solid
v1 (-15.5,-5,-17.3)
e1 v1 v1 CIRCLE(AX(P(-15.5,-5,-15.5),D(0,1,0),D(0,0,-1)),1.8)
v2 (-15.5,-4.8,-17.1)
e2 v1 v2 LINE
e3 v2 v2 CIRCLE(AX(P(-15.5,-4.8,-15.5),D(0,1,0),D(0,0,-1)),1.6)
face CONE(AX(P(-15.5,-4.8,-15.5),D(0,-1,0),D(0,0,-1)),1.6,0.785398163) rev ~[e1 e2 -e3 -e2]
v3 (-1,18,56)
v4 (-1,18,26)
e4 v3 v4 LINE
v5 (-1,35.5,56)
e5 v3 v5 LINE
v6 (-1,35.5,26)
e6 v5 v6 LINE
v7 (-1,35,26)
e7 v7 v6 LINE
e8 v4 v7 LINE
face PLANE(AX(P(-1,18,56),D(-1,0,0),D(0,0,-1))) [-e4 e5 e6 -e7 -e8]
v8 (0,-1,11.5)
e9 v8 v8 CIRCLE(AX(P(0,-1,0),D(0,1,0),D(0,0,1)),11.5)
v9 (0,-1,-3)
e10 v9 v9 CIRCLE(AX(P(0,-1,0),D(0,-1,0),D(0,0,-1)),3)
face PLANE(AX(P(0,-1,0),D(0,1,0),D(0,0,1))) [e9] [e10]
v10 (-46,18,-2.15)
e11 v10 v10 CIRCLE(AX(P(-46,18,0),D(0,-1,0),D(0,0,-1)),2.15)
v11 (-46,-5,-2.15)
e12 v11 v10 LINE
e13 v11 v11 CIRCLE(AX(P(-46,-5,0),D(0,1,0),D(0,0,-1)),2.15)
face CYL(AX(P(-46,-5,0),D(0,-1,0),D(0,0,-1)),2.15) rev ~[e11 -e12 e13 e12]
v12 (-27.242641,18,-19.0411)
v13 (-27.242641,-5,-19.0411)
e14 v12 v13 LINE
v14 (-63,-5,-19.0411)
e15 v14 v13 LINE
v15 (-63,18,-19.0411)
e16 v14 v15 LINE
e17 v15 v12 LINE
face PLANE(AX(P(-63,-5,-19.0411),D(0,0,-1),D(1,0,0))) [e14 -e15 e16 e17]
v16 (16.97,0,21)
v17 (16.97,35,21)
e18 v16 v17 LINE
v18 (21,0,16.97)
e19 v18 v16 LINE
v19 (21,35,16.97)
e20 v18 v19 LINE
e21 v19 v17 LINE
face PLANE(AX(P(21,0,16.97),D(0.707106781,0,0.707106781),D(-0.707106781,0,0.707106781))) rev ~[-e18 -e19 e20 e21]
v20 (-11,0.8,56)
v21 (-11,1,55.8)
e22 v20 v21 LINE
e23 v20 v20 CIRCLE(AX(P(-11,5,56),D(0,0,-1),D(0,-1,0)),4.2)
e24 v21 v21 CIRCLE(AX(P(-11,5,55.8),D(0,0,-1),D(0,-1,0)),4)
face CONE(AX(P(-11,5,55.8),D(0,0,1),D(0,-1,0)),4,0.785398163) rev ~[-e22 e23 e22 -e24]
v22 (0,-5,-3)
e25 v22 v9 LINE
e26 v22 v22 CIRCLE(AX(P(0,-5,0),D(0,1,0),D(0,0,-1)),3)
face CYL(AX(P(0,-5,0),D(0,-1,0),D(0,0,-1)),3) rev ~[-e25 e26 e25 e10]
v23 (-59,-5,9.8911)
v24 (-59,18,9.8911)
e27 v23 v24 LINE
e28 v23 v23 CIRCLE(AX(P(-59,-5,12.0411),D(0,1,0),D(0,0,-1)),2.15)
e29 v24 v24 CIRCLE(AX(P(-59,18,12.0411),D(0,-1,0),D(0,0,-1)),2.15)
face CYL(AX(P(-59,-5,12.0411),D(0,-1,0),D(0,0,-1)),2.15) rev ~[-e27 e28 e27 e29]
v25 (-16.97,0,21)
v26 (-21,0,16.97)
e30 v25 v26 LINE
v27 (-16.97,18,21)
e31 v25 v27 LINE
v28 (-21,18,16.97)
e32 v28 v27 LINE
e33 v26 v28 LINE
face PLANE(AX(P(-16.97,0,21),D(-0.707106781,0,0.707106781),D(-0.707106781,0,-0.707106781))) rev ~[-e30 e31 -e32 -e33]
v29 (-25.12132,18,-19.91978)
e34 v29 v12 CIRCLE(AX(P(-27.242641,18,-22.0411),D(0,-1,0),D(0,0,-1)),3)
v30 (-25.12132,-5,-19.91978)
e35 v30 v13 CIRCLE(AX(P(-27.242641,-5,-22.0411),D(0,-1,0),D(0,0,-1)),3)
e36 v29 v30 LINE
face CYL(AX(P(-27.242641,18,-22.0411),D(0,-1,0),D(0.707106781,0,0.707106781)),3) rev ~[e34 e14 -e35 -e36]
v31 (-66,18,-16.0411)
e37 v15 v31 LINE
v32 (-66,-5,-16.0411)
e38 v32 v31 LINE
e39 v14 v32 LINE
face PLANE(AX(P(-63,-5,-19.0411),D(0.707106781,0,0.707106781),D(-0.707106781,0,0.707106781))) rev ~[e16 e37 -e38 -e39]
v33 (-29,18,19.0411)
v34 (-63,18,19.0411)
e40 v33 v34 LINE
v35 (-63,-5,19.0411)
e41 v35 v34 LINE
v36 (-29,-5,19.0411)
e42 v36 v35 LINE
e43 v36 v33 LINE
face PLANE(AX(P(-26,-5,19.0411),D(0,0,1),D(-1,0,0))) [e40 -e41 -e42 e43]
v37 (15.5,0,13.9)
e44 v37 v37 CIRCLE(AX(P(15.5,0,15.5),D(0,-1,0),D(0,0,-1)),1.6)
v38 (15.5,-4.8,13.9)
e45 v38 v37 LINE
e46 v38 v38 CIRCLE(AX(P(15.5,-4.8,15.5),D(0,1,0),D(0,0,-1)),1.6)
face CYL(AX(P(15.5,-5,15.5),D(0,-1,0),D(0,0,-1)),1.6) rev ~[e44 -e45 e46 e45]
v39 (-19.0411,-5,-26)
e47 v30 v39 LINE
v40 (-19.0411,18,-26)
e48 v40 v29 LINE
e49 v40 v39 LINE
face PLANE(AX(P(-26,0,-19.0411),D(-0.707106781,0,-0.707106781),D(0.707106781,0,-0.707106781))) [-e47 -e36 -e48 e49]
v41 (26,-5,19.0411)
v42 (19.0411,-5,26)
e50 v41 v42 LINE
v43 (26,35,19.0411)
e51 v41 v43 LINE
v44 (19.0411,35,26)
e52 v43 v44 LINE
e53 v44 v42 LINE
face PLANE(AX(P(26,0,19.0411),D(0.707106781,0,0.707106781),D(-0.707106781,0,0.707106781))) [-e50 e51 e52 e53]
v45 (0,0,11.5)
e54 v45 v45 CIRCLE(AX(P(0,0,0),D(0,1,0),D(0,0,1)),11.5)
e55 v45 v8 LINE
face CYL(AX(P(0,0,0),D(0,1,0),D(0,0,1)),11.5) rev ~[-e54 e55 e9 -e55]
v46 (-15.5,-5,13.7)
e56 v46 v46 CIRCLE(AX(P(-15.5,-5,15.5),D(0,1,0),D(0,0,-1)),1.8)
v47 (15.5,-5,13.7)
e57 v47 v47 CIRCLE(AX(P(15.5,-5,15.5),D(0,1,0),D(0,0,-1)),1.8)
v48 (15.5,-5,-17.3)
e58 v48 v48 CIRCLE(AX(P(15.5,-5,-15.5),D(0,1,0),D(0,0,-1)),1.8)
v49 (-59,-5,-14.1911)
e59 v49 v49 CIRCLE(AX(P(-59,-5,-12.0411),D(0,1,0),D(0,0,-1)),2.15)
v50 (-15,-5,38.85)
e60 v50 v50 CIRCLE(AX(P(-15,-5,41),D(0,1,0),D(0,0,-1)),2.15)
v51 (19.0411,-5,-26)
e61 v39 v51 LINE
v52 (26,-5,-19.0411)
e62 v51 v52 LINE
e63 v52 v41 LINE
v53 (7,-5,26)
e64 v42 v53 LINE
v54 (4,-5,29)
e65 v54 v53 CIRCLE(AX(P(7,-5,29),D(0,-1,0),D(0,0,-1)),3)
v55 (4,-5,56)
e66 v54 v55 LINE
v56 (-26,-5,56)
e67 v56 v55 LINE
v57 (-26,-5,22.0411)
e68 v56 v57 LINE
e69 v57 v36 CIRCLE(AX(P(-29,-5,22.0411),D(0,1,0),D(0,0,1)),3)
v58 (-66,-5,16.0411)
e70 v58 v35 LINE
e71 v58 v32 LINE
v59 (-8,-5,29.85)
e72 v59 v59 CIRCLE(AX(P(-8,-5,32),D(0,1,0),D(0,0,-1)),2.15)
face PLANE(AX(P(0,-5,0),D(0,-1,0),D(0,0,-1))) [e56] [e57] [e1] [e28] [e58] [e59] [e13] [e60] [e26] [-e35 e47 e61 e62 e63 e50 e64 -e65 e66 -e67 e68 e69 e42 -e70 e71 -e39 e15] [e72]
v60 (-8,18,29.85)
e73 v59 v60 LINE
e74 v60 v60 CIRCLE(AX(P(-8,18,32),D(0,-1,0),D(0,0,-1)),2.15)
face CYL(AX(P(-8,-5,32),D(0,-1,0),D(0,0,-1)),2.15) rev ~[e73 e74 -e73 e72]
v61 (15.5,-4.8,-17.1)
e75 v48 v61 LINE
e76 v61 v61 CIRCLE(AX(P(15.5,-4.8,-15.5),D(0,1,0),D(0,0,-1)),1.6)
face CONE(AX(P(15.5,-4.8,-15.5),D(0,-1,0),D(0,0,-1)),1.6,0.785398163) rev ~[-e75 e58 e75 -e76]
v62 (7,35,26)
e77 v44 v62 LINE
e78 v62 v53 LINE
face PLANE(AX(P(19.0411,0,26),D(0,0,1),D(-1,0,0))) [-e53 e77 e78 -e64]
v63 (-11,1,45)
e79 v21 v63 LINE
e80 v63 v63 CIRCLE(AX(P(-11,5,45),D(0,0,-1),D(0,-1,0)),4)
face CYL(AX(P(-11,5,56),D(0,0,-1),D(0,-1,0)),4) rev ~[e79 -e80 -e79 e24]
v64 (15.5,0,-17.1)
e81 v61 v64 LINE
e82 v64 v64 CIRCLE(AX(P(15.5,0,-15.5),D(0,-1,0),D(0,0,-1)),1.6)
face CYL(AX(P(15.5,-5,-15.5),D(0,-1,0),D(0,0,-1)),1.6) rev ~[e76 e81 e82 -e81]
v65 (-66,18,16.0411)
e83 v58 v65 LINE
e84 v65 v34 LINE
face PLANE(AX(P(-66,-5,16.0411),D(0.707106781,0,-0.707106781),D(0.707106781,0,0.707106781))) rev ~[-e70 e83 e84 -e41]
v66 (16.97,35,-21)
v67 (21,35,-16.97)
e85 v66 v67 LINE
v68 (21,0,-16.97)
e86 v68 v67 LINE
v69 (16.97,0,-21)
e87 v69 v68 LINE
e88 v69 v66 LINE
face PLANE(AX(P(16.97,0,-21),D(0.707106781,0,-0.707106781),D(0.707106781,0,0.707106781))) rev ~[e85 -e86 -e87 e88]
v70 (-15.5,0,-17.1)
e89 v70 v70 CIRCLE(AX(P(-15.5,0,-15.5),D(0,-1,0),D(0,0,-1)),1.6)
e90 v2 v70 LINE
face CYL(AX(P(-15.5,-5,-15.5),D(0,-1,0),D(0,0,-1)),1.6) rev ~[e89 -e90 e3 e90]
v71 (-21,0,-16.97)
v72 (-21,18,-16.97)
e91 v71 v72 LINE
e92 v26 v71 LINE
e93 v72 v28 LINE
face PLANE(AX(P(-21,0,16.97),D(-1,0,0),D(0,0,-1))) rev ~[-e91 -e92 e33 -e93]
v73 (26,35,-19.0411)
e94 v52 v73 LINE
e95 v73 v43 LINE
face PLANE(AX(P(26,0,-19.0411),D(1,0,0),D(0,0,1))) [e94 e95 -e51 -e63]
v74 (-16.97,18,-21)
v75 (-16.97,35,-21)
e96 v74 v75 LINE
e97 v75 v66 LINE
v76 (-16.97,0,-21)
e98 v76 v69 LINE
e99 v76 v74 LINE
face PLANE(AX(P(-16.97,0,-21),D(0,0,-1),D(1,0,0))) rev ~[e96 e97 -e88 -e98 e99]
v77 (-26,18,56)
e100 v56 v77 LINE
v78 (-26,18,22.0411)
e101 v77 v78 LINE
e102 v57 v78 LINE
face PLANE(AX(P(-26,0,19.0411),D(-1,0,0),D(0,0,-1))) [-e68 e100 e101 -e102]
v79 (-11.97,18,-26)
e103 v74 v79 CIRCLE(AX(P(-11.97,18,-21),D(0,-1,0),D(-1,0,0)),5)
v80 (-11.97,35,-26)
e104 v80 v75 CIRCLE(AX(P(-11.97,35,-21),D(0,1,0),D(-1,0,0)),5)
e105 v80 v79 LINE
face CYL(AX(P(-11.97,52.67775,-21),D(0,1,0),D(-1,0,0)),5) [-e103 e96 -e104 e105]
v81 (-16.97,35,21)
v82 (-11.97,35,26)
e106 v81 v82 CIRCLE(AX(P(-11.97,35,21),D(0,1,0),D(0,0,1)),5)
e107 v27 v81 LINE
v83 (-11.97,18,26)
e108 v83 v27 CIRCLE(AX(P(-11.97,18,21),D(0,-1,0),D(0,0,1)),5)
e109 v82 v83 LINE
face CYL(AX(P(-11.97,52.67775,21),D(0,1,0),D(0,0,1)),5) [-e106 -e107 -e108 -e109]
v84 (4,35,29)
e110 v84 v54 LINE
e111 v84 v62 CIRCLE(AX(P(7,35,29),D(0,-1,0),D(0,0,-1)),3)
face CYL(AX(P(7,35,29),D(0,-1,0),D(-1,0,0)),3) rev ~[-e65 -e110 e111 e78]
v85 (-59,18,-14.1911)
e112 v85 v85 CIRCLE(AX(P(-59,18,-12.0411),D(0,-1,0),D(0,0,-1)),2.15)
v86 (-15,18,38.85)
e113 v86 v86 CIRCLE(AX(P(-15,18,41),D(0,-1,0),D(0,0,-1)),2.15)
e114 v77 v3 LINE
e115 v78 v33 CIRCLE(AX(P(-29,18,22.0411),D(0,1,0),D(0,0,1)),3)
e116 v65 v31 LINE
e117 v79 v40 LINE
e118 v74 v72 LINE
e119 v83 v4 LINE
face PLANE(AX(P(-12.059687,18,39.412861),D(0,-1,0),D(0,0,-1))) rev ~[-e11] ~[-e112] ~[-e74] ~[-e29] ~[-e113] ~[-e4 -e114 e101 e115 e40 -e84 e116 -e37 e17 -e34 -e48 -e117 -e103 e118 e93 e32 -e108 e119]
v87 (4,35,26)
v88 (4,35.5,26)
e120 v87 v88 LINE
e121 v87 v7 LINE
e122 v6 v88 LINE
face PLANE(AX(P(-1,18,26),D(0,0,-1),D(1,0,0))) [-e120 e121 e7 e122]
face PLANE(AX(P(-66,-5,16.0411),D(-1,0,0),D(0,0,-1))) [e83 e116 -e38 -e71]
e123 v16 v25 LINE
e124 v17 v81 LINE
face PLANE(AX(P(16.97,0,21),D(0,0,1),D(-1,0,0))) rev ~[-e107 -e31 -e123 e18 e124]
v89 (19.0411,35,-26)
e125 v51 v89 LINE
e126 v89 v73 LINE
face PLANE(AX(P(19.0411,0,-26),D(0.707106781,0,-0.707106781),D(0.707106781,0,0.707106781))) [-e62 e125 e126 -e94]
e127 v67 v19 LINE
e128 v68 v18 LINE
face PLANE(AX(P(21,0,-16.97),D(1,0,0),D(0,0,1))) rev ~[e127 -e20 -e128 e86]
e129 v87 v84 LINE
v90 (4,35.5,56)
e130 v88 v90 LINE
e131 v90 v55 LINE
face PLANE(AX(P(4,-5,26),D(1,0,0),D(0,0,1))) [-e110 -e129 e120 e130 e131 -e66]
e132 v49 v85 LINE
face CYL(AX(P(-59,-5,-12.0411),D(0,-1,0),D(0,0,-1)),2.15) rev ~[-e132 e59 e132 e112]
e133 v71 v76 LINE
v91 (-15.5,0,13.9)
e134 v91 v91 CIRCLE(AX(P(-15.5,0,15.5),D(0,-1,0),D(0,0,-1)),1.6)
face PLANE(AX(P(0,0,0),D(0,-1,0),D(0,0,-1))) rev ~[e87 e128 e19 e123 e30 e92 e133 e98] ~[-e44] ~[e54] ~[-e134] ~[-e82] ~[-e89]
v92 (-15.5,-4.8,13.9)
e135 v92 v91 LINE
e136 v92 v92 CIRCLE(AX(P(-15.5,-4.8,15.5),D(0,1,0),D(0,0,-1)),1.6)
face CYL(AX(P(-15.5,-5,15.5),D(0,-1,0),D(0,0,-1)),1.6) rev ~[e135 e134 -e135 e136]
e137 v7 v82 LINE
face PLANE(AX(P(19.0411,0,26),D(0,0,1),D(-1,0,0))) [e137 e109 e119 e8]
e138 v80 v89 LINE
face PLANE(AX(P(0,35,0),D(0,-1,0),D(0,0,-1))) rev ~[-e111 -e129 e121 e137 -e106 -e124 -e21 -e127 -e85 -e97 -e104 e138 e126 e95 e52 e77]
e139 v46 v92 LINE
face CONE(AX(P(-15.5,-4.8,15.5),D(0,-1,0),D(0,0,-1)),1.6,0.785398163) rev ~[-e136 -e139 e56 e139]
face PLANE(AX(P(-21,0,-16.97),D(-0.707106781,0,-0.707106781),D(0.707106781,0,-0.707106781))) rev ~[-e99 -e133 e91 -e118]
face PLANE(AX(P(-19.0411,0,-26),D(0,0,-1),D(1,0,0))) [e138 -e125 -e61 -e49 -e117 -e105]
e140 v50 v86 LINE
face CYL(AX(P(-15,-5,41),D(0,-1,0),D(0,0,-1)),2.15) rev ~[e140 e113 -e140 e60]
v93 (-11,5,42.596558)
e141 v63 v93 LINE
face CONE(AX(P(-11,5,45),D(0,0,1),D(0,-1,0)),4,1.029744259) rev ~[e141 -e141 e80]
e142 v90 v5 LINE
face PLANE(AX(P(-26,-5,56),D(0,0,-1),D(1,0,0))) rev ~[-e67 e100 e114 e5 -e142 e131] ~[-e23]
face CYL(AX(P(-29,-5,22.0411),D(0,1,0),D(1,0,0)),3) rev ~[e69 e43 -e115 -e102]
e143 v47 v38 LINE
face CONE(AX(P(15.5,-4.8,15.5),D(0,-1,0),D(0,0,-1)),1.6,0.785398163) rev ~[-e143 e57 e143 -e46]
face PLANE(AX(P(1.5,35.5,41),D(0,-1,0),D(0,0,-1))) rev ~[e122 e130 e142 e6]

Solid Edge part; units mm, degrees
sketch "Sketch1" plane through (0, 0, 0) normal (0, -1, 0) x (1, 0, 0)
  line L0 (21, 16.97) -> (16.97, 21)
  line L1 (16.97, 21) -> (-16.97, 21)
  line L2 (-16.97, 21) -> (-21, 16.97)
  line L3 (-21, 16.97) -> (-21, -16.97)
  line L4 (-21, -16.97) -> (-16.97, -21)
  line L5 (-16.97, -21) -> (16.97, -21)
  line L6 (16.97, -21) -> (21, -16.97)
  line L7 (21, -16.97) -> (21, 16.97)
  line L8 (26, 19.0411) -> (19.0411, 26)
  line L9 (19.0411, 26) -> (-19.0411, 26)
  line L10 (-19.0411, 26) -> (-26, 19.0411)
  line L11 (-26, 19.0411) -> (-26, -19.0411)
  line L12 (-26, -19.0411) -> (-19.0411, -26)
  line L13 (-19.0411, -26) -> (19.0411, -26)
  line L14 (19.0411, -26) -> (26, -19.0411)
  line L15 (26, -19.0411) -> (26, 19.0411)
  dimension "D1" = 33.94
  dimension "D2" = 33.94
  dimension "D3" = 33.94
  dimension "D4" = 33.94
  dimension "D5" = 42
  dimension "D6" = 42
  dimension "D7" = 21
  dimension "D8" = 5
extrude "Protrusion1" add sketch "Sketch1" against normal blind 35
sketch "Sketch2" plane through (0, 0, 0) normal (0, -1, 0) x (1, 0, 0)
  line L0 (19.0411, 26) -> (-19.0411, 26)
  line L1 (-19.0411, 26) -> (-26, 19.0411)
  line L2 (-26, 19.0411) -> (-26, -19.0411)
  line L3 (-26, -19.0411) -> (-19.0411, -26)
  line L4 (-19.0411, -26) -> (19.0411, -26)
  line L5 (19.0411, -26) -> (26, -19.0411)
  line L6 (26, -19.0411) -> (26, 19.0411)
  line L7 (26, 19.0411) -> (19.0411, 26)
extrude "Deckel" add sketch "Sketch2" along normal blind 5
hole "Motorwelle" at (0, -5, 0) direction (0, 1, 0) diameter 6 end up to next
hole "Hole1" at (-15.5, -5, -15.5) direction (0, 1, 0) diameter 3.2 end up to next start chamfer 0.2 start chamfer angle 45
hole "Hole2" at (-15.5, -5, 15.5) direction (0, 1, 0) diameter 3.2 end up to next start chamfer 0.2 start chamfer angle 45
hole "Hole3" at (15.5, -5, 15.5) direction (0, 1, 0) diameter 3.2 end up to next start chamfer 0.2 start chamfer angle 45
hole "Hole4" at (15.5, -5, -15.5) direction (0, 1, 0) diameter 3.2 end up to next start chamfer 0.2 start chamfer angle 45
sketch "Sketch3" plane through (0, 0, 0) normal (0, 1, 0) x (0, 0, 1)
  circle A0 centre (0, 0) radius 11.5
  dimension "D1" = 23
extrude "Motoflansch" cut sketch "Sketch3" against normal blind 1
sketch "Sketch4" plane through (0, -5, 0) normal (0, -1, 0) x (1, 0, 0)
  line L0 (-26, 19.0411) -> (-19.0411, 26)
  line L1 (-19.0411, 26) -> (4, 26)
  line L2 (4, 26) -> (4, 56)
  line L3 (-26, 56) -> (4, 56)
  line L4 (-26, 19.0411) -> (-26, 56)
  dimension "D1" = 30
  dimension "D2" = 30
extrude "Motoraufhängung_Leiste" add sketch "Sketch4" against normal blind 23
sketch "Sketch5" plane through (-13, 18, 33.5205) normal (0, 1, 0) x (-1, 0, 0)
  line L0 (-17, -7.5205) -> (-17, 22.4795)
  line L1 (-17, 22.4795) -> (-12, 22.4795)
  line L2 (-12, 22.4795) -> (-12, -7.5205)
  line L3 (-12, -7.5205) -> (-17, -7.5205)
  dimension "D1" = 5
extrude "Zentrierung_Leiste" add sketch "Sketch5" along normal blind 17.5
sketch "Sketch6" plane through (0, -5, 11) normal (0, -1, 0) x (1, 0, 0)
  line L0 (-26, -30.0411) -> (-26, 8.0411)
  line L1 (-26, 8.0411) -> (-63, 8.0411)
  line L2 (-66, 5.0411) -> (-63, 8.0411)
  line L3 (-66, 5.0411) -> (-66, -27.0411)
  line L4 (-63, -30.0411) -> (-66, -27.0411)
  line L5 (-63, -30.0411) -> (-26, -30.0411)
  dimension "D1" = 3
  dimension "D2" = 3
  dimension "D3" = 40
extrude "Auflage_auf_Platte" add sketch "Sketch6" against normal blind 23
hole "Bohrung_Alustange" at (-11, 5, 56) direction (0, 0, -1) diameter 8 depth 11 tip angle 118 start chamfer 0.2 start chamfer angle 45
sketch "Sketch7" plane through (0, 35, 0) normal (0, 1, 0) x (1, 0, 0)
  line L0 (-19.0411, 26) -> (-16.97, 21)
  line L1 (-16.97, 21) -> (-16.97, -21)
  line L2 (-16.97, -21) -> (-19.0411, -26)
  line L3 (-19.0411, -26) -> (-26, -26)
  line L4 (-26, -26) -> (-26, 26)
  line L5 (-26, 26) -> (-19.0411, 26)
extrude "Motorseite" cut sketch "Sketch7" against normal blind 17
hole "Hole5" at (-8, -5, 32) direction (0, 1, 0) diameter 4.3 end up to next
hole "Hole6" at (-15, -5, 41) direction (0, 1, 0) diameter 4.3 end up to next
hole "Hole7" at (-59, -5, 12.0411) direction (0, 1, 0) diameter 4.3 end up to next
hole "Hole8" at (-59, -5, -12.0411) direction (0, 1, 0) diameter 4.3 end up to next
hole "Hole9" at (-46, -5, 0) direction (0, 1, 0) diameter 4.3 end up to next
fillet "Verrundung_Innen" radius 3 3 edges at (-26, 6.5, -19.0411) (-26, 6.5, 19.0411) (4, 15, 26)
fillet "Verrundung_spitzeEcke" radius 5 2 edges at (-19.0411, 26.5, 26) (-19.0411, 26.5, -26)
